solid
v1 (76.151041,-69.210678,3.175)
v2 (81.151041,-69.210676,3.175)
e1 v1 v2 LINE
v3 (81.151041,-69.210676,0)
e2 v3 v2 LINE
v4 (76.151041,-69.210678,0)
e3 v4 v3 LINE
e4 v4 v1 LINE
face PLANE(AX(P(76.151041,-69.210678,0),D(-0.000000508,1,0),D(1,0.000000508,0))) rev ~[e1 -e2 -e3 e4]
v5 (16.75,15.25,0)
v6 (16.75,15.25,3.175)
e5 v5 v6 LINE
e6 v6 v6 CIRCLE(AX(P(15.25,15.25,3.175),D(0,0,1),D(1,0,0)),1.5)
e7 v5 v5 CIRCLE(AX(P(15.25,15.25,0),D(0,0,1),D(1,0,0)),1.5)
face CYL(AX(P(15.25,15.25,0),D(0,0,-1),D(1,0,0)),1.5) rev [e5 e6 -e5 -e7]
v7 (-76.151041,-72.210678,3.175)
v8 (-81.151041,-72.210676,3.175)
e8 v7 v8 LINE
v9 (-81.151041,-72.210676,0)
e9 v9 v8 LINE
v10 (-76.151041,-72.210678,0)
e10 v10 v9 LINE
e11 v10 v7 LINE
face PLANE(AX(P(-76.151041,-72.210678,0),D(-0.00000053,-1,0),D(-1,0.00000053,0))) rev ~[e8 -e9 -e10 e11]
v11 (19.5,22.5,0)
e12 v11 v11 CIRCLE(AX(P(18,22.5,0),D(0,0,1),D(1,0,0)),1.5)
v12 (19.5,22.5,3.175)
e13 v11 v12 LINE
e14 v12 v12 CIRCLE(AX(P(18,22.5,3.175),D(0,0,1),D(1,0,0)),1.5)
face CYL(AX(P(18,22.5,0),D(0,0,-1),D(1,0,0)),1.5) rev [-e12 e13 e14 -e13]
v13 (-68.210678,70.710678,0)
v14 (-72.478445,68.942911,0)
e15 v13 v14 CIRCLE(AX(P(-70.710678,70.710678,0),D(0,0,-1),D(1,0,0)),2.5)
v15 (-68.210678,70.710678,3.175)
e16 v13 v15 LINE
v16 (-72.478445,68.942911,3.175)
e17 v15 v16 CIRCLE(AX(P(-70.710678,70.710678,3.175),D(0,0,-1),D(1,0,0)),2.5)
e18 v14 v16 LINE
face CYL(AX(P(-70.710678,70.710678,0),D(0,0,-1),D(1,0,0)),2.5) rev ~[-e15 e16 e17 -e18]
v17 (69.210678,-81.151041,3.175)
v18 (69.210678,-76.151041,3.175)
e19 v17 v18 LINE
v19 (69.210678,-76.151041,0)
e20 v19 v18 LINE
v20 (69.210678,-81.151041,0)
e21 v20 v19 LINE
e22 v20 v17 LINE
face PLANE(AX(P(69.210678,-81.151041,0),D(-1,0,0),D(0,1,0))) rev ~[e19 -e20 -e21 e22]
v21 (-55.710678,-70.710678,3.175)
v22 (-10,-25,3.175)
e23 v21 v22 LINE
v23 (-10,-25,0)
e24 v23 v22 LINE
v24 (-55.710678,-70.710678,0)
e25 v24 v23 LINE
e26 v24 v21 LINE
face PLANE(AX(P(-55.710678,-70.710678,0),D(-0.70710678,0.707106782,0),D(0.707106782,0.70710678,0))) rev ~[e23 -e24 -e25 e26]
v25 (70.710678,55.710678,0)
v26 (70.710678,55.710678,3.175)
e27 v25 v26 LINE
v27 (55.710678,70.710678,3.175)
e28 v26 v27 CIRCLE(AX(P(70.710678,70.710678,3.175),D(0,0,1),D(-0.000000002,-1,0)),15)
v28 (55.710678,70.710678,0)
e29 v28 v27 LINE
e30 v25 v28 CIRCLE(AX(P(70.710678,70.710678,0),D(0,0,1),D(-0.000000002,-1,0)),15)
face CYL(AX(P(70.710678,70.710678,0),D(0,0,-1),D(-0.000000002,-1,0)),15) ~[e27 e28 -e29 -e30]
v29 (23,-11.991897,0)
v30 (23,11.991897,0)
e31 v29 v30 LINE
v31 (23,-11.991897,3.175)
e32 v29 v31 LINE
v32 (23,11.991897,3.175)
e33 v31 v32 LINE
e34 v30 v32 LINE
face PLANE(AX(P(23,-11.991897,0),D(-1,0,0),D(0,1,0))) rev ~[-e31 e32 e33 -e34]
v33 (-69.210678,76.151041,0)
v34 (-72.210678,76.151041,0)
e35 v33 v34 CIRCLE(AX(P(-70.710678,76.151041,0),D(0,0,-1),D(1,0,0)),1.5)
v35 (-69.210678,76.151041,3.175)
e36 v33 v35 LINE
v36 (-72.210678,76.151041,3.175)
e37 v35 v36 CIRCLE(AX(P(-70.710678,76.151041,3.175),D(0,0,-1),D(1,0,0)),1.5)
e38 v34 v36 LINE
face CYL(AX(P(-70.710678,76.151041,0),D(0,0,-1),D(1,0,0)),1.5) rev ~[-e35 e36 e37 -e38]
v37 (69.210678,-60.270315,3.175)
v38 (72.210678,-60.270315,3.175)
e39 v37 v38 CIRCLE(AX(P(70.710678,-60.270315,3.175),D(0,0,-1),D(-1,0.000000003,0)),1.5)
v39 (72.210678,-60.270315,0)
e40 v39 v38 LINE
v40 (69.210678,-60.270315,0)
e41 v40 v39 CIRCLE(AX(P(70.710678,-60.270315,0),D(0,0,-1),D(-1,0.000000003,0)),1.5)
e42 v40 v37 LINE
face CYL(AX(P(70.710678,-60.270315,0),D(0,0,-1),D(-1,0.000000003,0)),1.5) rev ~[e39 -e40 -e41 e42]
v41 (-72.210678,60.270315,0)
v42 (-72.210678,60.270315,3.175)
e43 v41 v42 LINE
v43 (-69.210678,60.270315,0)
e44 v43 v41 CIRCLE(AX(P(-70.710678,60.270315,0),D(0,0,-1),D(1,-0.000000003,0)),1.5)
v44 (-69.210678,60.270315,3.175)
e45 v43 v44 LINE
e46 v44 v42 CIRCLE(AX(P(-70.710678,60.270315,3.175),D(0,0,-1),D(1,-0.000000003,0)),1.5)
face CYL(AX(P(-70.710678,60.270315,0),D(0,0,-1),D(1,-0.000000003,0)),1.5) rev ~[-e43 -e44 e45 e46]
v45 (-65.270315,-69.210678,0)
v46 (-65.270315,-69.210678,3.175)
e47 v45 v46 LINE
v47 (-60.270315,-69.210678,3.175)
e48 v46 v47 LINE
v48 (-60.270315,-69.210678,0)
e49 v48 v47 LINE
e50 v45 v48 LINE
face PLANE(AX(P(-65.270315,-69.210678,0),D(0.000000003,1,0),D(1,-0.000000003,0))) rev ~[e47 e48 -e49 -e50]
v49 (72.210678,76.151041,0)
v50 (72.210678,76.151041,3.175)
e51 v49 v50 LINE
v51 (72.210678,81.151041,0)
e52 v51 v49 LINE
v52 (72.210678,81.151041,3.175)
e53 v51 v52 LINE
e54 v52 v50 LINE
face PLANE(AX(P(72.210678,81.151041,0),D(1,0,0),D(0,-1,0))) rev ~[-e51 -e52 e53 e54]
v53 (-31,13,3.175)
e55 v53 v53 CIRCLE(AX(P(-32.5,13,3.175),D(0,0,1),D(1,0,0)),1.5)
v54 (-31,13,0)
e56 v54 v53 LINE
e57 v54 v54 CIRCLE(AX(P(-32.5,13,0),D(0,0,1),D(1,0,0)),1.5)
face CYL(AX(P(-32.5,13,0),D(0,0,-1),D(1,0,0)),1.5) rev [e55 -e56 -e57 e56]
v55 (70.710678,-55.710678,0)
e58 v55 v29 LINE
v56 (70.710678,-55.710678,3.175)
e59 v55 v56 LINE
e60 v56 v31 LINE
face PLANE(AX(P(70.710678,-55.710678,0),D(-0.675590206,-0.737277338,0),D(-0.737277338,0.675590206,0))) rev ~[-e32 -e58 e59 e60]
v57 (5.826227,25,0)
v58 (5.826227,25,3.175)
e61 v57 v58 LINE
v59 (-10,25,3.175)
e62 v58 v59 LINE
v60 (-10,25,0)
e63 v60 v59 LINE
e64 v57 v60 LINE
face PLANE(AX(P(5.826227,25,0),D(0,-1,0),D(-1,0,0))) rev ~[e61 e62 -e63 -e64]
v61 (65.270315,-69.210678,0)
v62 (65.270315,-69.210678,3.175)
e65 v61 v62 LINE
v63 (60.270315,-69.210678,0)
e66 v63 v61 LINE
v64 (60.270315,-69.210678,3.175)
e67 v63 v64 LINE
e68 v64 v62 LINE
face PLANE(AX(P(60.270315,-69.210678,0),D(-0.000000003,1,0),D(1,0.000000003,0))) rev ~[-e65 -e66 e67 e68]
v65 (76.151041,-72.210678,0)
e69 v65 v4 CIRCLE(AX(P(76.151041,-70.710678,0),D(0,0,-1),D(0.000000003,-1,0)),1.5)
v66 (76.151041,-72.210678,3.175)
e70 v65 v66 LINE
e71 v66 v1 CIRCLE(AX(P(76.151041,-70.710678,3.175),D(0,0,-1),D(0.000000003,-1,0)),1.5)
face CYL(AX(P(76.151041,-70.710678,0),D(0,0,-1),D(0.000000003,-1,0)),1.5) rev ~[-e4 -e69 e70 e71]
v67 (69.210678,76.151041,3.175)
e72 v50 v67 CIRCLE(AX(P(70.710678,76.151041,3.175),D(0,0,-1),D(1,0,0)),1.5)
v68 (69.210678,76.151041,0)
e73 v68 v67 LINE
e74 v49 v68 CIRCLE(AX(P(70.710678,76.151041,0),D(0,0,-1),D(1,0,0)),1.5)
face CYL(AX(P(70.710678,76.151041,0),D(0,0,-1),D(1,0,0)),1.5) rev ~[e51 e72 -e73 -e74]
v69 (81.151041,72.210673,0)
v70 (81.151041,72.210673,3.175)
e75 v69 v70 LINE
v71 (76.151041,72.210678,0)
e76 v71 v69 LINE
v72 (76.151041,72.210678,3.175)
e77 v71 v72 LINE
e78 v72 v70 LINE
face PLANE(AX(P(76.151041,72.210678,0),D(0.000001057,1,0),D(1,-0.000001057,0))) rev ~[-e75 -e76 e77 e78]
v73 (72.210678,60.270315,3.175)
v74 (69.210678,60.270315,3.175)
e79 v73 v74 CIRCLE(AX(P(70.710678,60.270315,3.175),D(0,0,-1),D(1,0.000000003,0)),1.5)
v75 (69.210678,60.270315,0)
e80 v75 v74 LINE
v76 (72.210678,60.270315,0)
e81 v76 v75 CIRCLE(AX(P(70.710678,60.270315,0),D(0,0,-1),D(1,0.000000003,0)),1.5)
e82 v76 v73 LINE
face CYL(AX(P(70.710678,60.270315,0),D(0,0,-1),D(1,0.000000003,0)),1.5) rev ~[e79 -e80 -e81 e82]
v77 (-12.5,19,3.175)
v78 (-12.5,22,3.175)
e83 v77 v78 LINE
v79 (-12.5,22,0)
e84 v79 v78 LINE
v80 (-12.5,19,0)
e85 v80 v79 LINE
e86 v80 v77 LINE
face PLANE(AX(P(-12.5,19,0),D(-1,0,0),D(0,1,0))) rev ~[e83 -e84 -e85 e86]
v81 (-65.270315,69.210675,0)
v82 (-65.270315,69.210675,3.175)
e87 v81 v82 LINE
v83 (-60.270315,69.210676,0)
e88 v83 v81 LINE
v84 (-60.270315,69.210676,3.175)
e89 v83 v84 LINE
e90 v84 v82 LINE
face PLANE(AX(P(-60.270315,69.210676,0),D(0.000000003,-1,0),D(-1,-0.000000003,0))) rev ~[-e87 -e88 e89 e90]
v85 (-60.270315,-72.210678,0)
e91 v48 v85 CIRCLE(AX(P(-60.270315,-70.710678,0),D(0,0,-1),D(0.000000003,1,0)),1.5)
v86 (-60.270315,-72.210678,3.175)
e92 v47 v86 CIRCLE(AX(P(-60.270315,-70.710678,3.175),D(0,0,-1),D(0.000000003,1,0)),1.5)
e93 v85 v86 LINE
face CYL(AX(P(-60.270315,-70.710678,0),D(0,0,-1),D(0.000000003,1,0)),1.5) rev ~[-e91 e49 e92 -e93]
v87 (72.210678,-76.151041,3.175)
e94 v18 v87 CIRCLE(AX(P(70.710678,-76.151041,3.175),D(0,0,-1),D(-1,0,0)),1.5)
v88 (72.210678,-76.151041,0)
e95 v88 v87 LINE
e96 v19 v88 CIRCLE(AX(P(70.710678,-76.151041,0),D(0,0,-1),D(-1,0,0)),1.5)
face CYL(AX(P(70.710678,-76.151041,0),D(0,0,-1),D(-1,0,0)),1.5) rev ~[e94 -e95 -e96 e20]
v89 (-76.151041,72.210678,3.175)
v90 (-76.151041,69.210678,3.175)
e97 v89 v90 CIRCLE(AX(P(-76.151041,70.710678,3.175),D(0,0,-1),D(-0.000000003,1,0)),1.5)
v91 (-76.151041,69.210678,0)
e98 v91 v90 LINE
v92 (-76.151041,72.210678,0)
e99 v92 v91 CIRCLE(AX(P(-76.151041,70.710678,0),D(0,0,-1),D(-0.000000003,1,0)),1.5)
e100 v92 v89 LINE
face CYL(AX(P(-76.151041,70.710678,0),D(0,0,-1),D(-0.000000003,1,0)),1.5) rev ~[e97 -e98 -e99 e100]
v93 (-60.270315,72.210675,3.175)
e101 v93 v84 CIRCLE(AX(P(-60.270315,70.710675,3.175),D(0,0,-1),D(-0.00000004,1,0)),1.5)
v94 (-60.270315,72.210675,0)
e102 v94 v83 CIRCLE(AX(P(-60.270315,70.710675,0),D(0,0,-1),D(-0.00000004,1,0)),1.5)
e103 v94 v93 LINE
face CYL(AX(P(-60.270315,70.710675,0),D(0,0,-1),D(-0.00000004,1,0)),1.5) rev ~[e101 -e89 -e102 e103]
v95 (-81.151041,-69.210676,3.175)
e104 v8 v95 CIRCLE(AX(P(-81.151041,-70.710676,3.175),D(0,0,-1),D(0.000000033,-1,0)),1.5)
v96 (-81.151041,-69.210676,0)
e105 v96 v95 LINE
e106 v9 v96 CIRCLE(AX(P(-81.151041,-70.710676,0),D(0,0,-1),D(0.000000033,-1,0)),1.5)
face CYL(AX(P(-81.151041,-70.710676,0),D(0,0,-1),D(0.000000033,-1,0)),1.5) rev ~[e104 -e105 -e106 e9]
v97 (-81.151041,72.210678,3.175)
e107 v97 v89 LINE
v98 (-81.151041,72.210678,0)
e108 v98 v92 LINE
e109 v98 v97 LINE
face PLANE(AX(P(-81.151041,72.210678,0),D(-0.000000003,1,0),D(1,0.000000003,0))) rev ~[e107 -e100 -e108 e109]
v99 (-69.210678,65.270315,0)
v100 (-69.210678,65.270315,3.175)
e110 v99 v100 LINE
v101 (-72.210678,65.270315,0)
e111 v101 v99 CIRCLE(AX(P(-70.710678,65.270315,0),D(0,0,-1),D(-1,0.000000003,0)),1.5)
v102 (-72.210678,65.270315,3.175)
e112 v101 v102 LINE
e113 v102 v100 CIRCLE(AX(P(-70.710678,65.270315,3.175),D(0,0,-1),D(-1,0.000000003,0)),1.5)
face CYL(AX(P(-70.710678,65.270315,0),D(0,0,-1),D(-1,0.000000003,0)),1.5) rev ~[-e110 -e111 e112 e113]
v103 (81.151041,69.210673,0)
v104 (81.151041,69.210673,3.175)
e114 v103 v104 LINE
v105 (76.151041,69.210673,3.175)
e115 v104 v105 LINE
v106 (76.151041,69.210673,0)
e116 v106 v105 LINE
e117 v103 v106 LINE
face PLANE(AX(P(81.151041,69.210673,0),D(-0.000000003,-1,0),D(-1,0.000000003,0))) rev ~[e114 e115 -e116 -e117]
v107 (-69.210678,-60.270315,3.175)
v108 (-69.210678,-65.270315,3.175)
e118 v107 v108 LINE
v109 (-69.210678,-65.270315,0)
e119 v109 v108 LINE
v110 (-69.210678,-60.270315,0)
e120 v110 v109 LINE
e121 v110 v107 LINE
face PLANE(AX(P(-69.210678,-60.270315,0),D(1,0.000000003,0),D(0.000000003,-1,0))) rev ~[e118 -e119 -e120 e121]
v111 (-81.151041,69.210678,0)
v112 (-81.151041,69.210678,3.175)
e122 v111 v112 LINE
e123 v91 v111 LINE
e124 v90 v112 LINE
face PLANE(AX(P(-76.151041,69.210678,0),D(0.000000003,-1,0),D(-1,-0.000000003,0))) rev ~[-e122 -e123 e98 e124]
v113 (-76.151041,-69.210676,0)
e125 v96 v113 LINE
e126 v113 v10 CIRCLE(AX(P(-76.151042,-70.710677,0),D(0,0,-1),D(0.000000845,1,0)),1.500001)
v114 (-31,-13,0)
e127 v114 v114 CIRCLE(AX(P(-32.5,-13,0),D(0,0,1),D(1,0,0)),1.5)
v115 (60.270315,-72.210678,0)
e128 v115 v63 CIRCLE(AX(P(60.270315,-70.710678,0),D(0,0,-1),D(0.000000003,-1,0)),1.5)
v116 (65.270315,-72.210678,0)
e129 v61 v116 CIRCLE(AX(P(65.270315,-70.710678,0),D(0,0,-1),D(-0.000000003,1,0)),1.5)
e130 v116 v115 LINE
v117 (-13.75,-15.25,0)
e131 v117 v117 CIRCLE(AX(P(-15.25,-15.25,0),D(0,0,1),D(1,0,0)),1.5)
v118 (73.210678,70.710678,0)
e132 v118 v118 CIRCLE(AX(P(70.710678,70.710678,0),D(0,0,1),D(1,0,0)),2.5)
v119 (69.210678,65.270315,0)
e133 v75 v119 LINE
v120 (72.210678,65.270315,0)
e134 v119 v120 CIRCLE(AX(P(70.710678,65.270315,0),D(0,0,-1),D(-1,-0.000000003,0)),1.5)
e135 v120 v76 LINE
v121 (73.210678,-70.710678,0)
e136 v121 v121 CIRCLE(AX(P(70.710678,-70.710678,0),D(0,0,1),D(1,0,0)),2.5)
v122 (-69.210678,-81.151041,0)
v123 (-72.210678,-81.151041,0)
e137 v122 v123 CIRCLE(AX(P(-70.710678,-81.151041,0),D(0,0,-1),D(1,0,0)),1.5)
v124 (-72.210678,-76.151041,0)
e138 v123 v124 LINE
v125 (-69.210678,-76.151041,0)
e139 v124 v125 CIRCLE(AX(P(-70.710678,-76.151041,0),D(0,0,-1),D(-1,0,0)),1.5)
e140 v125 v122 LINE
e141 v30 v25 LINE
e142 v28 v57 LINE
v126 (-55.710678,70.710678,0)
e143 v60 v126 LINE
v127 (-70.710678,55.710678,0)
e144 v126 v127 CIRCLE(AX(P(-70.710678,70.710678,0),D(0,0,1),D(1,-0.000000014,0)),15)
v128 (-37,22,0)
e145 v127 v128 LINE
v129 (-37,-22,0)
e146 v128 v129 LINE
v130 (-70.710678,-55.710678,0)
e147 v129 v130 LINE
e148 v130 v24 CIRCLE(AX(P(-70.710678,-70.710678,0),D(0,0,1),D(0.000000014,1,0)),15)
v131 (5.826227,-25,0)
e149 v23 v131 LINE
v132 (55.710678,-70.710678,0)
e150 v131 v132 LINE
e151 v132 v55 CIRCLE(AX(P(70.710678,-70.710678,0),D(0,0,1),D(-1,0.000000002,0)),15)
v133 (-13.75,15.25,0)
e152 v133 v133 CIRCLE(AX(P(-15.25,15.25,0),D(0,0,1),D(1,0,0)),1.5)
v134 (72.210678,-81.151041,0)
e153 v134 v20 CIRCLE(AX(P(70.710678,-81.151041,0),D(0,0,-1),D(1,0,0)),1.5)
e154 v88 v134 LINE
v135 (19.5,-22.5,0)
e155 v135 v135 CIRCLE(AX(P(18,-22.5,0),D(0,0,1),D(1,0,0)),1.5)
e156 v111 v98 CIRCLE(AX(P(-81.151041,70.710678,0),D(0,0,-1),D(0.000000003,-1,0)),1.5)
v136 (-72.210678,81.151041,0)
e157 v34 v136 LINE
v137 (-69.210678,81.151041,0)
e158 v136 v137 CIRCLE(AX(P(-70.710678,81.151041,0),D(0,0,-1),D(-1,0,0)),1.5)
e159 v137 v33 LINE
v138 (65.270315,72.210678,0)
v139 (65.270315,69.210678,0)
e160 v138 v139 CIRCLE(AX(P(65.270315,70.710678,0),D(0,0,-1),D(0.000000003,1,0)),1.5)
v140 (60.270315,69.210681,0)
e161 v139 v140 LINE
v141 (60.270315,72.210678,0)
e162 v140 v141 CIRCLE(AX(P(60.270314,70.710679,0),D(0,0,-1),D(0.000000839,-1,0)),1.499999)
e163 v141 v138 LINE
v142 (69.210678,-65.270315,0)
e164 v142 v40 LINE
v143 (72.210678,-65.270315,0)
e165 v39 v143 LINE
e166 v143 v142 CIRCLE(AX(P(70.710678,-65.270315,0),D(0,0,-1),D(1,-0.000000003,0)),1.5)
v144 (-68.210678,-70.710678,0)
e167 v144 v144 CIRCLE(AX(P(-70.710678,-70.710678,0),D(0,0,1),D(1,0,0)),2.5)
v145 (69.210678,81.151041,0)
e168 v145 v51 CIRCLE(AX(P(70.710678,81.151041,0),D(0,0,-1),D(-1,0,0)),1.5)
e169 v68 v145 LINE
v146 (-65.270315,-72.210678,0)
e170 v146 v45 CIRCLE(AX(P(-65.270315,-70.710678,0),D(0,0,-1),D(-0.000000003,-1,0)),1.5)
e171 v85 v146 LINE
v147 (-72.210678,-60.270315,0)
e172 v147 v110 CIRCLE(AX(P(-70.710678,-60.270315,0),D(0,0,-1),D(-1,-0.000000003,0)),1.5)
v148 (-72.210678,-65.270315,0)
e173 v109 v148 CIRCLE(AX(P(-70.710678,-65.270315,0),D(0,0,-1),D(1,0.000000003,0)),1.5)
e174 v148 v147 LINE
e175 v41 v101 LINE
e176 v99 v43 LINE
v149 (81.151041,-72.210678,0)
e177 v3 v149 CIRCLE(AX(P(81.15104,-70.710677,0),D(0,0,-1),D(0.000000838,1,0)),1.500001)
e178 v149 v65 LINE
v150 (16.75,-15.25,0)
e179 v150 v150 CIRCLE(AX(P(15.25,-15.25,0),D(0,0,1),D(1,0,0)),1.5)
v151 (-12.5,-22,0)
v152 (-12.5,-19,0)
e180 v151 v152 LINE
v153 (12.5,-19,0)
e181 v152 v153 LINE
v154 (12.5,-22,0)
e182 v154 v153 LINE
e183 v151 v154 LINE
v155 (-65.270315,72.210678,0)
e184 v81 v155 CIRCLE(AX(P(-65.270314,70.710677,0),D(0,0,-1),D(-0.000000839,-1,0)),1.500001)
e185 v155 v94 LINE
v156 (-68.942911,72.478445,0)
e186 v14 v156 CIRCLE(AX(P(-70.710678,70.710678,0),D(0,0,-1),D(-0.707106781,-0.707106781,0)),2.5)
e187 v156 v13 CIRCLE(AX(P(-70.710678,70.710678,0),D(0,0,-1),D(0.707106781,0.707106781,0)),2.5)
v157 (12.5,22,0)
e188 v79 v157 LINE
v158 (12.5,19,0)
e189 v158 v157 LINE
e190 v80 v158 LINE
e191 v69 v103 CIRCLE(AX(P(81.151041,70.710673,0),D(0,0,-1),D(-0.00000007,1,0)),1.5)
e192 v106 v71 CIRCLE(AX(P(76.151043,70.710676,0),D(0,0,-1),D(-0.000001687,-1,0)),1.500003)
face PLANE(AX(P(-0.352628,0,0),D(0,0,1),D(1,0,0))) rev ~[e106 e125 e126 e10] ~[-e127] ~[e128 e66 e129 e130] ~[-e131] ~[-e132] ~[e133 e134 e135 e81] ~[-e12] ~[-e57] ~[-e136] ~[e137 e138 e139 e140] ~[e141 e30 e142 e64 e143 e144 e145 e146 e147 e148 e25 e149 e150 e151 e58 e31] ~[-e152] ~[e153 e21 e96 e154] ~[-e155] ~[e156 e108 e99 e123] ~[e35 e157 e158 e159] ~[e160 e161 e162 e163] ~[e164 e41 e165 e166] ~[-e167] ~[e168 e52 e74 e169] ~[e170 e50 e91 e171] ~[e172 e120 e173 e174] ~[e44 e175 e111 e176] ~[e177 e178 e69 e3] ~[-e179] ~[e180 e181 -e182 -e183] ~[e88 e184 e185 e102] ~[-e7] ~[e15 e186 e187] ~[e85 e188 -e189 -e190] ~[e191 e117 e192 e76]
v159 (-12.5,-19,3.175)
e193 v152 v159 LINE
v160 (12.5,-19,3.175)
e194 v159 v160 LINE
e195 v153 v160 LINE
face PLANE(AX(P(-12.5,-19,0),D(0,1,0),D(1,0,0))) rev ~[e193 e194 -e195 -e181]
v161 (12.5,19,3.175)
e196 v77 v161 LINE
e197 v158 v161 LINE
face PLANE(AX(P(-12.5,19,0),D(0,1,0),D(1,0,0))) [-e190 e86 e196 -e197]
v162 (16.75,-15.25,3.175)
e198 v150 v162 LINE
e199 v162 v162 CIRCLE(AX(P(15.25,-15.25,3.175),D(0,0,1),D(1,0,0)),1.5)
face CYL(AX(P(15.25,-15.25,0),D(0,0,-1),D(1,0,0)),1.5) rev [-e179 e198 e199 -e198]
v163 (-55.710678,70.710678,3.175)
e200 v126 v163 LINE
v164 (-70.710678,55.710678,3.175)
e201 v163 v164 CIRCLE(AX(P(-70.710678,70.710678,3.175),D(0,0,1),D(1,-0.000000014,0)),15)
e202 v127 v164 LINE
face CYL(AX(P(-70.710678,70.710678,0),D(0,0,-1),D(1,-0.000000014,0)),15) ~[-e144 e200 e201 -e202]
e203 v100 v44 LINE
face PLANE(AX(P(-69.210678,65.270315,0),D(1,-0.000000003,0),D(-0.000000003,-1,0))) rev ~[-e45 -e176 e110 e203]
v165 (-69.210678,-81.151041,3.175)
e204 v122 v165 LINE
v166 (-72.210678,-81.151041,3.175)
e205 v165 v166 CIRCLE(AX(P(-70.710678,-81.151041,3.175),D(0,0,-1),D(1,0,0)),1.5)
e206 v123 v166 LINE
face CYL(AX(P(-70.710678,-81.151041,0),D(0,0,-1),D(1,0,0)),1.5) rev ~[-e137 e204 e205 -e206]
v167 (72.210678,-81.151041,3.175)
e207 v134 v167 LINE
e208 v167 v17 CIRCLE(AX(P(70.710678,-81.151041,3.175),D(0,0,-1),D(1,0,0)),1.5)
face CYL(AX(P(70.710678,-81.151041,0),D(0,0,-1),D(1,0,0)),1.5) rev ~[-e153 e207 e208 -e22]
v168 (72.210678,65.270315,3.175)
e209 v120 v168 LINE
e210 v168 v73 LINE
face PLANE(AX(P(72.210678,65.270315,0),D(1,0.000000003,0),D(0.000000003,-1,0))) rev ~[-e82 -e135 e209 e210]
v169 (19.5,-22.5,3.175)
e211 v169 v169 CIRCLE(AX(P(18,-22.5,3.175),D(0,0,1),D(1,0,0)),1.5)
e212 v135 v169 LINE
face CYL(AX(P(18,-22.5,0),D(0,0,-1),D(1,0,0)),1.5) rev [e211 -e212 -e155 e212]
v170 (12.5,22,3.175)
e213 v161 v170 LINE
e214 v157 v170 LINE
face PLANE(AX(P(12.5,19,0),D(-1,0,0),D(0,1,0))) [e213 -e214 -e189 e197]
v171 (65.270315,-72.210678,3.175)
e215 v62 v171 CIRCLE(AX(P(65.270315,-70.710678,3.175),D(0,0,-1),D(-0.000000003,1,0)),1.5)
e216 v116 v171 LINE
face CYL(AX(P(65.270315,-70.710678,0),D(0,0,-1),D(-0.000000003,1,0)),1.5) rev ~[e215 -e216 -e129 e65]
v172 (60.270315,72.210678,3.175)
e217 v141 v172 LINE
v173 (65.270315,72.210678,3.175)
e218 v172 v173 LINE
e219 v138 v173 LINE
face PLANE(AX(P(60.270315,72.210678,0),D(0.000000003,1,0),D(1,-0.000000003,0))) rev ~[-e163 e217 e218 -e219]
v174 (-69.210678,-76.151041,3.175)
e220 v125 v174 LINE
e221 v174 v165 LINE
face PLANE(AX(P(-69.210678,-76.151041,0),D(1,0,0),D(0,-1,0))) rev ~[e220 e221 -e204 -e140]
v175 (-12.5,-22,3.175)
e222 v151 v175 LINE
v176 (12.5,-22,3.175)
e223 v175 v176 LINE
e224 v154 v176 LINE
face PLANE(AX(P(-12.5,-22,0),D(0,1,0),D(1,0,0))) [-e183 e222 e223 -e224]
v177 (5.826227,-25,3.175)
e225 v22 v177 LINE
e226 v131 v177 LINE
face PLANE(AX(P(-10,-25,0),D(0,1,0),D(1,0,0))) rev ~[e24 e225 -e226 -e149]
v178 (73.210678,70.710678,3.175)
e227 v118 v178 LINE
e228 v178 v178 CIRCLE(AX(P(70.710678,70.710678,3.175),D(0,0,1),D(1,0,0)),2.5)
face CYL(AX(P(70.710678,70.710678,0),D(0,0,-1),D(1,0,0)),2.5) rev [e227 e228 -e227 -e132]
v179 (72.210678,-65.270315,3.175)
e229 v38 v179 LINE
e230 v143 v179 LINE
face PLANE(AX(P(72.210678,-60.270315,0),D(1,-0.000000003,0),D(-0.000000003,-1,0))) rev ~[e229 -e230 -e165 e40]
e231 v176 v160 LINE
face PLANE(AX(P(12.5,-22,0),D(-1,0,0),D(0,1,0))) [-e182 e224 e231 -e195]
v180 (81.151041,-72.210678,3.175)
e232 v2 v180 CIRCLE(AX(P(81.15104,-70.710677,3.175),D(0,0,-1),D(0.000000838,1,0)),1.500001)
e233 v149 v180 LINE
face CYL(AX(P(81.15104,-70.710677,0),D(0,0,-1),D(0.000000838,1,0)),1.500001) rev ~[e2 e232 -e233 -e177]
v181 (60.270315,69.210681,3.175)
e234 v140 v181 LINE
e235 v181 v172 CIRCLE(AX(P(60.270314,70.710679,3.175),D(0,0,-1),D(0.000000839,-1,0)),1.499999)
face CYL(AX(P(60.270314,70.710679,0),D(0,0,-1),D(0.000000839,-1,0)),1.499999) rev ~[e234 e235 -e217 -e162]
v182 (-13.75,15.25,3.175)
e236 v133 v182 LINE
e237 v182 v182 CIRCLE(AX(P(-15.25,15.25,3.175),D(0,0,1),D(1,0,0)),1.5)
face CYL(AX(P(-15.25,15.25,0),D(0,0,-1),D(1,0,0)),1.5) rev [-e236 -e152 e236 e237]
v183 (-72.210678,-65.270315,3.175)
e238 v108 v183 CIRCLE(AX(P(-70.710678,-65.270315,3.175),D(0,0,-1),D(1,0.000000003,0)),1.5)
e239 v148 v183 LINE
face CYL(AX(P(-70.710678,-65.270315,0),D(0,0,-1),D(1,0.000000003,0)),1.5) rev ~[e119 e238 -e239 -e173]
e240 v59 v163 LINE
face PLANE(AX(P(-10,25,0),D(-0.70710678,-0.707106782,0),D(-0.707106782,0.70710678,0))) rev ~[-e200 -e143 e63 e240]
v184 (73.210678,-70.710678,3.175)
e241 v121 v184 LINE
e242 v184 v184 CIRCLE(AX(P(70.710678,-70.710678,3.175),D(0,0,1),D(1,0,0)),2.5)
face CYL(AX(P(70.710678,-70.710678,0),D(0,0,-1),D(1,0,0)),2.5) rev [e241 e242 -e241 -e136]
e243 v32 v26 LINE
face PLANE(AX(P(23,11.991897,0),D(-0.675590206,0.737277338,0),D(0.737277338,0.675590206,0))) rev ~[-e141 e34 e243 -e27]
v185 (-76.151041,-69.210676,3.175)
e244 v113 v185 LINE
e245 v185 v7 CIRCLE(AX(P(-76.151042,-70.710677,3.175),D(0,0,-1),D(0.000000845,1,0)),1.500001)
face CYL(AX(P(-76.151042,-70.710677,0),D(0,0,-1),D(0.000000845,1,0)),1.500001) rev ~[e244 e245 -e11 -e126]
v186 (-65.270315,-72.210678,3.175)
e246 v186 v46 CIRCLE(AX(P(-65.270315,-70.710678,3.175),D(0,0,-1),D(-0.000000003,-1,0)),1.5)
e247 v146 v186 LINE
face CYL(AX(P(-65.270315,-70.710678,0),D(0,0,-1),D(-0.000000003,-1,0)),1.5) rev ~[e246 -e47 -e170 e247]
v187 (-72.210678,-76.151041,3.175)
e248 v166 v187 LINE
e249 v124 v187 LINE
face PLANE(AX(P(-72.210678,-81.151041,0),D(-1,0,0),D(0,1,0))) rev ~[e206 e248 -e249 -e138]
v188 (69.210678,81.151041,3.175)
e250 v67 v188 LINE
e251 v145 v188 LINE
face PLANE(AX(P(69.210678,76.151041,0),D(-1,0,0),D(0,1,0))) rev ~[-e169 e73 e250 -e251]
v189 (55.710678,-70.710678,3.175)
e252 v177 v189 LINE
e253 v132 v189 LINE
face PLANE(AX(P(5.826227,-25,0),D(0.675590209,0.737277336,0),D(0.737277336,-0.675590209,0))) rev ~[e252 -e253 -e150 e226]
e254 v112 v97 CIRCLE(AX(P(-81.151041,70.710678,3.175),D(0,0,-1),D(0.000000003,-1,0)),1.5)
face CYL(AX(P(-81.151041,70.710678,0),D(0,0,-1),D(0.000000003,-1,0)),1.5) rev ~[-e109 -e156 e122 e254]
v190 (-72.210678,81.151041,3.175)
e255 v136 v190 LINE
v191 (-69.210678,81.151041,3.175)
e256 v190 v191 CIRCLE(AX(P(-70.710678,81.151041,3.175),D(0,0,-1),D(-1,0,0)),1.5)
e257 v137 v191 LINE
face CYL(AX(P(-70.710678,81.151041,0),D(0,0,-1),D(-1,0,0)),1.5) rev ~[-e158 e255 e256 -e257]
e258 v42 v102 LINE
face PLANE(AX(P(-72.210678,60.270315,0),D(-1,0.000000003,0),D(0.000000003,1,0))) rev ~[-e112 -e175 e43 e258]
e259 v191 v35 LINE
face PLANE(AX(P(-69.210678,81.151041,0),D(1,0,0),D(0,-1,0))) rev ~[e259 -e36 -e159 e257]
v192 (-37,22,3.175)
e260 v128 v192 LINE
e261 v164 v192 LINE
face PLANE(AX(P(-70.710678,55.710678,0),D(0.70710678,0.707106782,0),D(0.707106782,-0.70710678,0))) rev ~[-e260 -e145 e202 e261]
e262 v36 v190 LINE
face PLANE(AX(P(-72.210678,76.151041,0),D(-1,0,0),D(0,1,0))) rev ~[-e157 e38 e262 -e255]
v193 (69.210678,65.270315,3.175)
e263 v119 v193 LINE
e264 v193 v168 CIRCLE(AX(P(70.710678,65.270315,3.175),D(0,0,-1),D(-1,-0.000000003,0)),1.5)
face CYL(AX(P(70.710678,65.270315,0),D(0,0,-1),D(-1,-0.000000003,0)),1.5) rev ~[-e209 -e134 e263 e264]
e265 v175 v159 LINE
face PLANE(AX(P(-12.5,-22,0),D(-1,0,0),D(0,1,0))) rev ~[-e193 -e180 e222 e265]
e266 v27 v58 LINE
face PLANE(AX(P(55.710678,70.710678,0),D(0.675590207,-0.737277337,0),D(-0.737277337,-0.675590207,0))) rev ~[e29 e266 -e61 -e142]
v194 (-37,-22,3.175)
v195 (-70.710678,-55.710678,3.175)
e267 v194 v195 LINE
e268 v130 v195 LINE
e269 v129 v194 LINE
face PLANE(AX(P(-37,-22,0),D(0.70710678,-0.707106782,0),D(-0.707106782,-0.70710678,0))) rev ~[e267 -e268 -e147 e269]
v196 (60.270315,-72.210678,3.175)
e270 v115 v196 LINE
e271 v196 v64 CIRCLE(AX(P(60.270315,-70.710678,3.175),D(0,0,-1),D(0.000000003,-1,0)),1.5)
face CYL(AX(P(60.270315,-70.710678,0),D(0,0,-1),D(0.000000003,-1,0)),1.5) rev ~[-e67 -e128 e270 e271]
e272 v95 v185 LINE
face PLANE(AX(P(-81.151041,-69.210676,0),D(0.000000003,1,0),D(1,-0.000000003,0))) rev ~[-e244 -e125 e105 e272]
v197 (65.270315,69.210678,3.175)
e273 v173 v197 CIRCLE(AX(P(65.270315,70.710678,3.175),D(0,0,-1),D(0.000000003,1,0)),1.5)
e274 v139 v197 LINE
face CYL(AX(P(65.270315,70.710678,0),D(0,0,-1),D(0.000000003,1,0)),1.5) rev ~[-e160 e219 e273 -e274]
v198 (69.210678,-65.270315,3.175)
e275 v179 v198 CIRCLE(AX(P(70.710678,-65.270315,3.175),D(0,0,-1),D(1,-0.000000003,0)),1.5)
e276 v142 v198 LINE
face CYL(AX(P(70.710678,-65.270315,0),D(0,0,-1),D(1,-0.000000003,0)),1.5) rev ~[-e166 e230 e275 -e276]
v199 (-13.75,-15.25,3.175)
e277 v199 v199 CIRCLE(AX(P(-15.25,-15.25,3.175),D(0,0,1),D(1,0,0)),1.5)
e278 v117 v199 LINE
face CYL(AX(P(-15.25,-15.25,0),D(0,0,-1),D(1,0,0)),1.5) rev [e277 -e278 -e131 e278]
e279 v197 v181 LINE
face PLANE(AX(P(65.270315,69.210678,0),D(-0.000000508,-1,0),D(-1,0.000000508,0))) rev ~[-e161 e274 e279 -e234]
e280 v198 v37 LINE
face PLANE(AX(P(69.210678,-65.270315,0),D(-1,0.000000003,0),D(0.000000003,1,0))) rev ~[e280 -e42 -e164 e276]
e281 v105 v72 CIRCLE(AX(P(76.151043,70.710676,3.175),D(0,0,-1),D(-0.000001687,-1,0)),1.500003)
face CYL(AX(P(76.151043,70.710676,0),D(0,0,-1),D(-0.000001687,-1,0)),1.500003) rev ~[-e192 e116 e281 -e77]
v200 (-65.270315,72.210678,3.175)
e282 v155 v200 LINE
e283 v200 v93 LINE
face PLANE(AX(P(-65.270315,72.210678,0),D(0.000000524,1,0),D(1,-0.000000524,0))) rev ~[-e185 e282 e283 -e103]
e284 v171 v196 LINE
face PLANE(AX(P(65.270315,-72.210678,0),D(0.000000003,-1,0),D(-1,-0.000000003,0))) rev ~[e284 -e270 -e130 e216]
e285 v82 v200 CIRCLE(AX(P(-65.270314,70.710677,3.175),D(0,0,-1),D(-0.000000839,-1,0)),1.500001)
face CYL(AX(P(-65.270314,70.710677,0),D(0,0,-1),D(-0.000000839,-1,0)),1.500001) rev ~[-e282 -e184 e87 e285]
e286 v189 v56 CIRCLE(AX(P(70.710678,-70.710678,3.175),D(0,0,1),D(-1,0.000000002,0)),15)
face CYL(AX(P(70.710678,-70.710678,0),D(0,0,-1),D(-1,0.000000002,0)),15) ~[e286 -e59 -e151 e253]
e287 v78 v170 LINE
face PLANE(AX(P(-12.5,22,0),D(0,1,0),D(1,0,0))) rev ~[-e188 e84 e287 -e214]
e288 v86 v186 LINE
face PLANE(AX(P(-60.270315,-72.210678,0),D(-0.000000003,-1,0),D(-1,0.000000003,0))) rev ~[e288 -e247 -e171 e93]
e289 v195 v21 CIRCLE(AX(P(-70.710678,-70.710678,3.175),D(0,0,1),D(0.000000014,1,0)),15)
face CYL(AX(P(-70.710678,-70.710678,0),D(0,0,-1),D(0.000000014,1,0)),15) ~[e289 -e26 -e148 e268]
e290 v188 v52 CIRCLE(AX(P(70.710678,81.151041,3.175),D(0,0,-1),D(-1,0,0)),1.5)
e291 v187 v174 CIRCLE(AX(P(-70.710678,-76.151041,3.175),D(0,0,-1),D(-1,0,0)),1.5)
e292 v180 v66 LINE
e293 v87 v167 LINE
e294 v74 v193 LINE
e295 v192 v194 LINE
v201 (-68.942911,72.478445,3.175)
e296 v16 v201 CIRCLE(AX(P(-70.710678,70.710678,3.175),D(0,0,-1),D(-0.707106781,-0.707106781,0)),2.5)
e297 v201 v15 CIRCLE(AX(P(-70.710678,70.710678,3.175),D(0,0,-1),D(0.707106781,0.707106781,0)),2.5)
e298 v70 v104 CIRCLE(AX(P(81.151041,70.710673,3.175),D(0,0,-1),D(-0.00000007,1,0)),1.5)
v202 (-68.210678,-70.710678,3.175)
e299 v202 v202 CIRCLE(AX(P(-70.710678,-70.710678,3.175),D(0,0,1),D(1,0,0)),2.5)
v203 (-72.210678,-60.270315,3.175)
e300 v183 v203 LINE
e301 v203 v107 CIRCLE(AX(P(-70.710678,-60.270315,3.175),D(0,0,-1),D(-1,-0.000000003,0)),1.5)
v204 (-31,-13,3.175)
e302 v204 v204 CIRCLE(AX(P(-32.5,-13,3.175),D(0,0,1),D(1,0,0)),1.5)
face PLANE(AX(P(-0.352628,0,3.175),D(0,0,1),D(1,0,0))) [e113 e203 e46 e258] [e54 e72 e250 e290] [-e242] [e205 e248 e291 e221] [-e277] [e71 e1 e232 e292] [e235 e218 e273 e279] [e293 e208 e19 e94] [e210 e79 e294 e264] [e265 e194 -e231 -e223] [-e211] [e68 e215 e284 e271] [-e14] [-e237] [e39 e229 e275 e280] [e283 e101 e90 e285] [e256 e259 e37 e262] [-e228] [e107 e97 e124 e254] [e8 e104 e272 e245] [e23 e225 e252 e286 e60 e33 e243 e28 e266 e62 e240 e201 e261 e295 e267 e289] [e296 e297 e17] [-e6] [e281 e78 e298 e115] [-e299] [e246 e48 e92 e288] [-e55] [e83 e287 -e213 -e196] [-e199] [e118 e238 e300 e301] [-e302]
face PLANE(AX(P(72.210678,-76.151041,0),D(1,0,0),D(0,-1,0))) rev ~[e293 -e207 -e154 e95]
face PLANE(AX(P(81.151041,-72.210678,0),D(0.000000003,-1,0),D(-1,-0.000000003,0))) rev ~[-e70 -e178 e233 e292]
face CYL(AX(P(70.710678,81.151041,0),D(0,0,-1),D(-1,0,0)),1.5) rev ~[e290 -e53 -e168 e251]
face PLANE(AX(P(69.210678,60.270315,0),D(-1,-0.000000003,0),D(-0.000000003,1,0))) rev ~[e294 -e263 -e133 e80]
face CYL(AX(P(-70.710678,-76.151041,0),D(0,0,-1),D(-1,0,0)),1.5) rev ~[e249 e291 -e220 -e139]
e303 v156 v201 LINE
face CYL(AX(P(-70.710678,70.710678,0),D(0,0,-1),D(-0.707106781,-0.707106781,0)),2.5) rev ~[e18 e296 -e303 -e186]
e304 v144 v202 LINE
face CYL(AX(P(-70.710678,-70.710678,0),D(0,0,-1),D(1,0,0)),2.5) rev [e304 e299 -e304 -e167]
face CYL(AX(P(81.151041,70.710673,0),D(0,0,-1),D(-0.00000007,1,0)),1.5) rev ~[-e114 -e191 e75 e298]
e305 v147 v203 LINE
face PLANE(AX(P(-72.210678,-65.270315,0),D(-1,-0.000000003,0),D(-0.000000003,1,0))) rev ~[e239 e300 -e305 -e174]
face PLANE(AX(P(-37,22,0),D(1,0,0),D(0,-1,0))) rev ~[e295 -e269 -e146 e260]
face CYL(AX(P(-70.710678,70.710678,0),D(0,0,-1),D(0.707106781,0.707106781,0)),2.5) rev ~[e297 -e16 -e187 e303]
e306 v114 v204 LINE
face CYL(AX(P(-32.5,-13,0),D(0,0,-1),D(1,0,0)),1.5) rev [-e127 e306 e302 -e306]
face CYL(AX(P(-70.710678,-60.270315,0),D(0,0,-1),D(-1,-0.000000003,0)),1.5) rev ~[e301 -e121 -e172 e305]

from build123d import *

# Parameters (mm, degrees)
F0_R     = 2.5
F0_R_2   = 1.5
F0_W     = 25
F0_H     = 3
F1_DEPTH = 3.175


# Not quite as in the source:
# - ends of sketch curves that miss each other by under 0.0002 mm in the source are joined


with BuildPart() as f1:
    # F0 (on Top) → F1 (new body)
    with BuildSketch(Plane.XY):
        with BuildLine():
            Line((-10.0000000587, 25), (-55.7106781187, 70.7106779065))
            ThreePointArc((-55.7106781187, 70.7106779065), (-81.3172799026, 81.3172797703), (-70.7106779065, 55.7106781187))
            Line((-70.7106779065, 55.7106781187), (-37, 22.0000003253))
            Line((-37, 22.0000003253), (-37, -22.0000003253))
            Line((-37, -22.0000003253), (-70.7106779065, -55.7106781187))
            ThreePointArc((-70.7106779065, -55.7106781187), (-81.3172798365, -81.3172798365), (-55.7106781187, -70.7106779065))
            Line((-55.7106781187, -70.7106779065), (-10.0000000587, -25))
            Line((-10.0000000587, -25), (5.8262266936, -25))
            Line((5.8262266936, -25), (55.7106781187, -70.7106780935))
            ThreePointArc((55.7106781187, -70.7106780935), (81.3172798365, -81.3172798365), (70.7106780935, -55.7106781187))
            Line((70.7106780935, -55.7106781187), (23, -11.9918965954))
            Line((23, -11.9918965954), (23, 11.9918965954))
            Line((23, 11.9918965954), (70.7106780935, 55.7106781187))
            ThreePointArc((70.7106780935, 55.7106781187), (81.3172798365, 81.3172798365), (55.7106781187, 70.7106779065))
            Line((55.7106781187, 70.7106779065), (5.8262266936, 25))
            Line((5.8262266936, 25), (-10.0000000587, 25))
        make_face()
        with BuildLine():
            Line((-72.210678, -81.1510407925), (-72.210678, -76.1510407925))
            ThreePointArc((-72.210678, -76.1510407925), (-70.710678, -74.6510407925), (-69.210678, -76.1510407925))
            Line((-69.210678, -76.1510407925), (-69.210678, -81.1510407925))
            ThreePointArc((-69.210678, -81.1510407925), (-70.710678, -82.6510407925), (-72.210678, -81.1510407925))
        make_face(mode=Mode.SUBTRACT)
        with BuildLine():
            Line((-81.1510407874, -69.2106756767), (-76.1510407874, -69.2106756935))
            ThreePointArc((-76.1510407874, -69.2106756935), (-74.6510407925, -70.7106782241), (-76.1510407975, -72.2106782191))
            Line((-76.1510407975, -72.2106782191), (-81.1510407975, -72.2106755673))
            ThreePointArc((-81.1510407975, -72.2106755673), (-82.6510407925, -70.7106781972), (-81.1510407874, -69.2106756767))
        make_face(mode=Mode.SUBTRACT)
        with Locations((-70.7106781187, -70.7106781187)):
            Circle(F0_R, mode=Mode.SUBTRACT)
        with BuildLine():
            Line((-60.2703154499, -72.210678035), (-65.2703154499, -72.2106780183))
            ThreePointArc((-65.2703154499, -72.2106780183), (-66.7703154448, -70.7106780132), (-65.2703154398, -69.2106780183))
            Line((-65.2703154398, -69.2106780183), (-60.2703154398, -69.210678035))
            ThreePointArc((-60.2703154398, -69.210678035), (-58.7703154448, -70.7106780401), (-60.2703154499, -72.210678035))
        make_face(mode=Mode.SUBTRACT)
        with BuildLine():
            Line((-69.210678035, -60.2703154398), (-69.2106780183, -65.2703154398))
            ThreePointArc((-69.2106780183, -65.2703154398), (-70.7106780132, -66.7703154448), (-72.2106780183, -65.2703154499))
            Line((-72.2106780183, -65.2703154499), (-72.210678035, -60.2703154499))
            ThreePointArc((-72.210678035, -60.2703154499), (-70.7106780401, -58.7703154448), (-69.210678035, -60.2703154398))
        make_face(mode=Mode.SUBTRACT)
        with Locations((-32.5, -13)):
            Circle(F0_R_2, mode=Mode.SUBTRACT)
        with Locations((-15.25, -15.25)):
            Circle(F0_R_2, mode=Mode.SUBTRACT)
        with BuildLine():
            Line((60.2703154398, -69.210678035), (65.2703154398, -69.2106780183))
            ThreePointArc((65.2703154398, -69.2106780183), (66.7703154448, -70.7106780132), (65.2703154499, -72.2106780183))
            Line((65.2703154499, -72.2106780183), (60.2703154499, -72.210678035))
            ThreePointArc((60.2703154499, -72.210678035), (58.7703154448, -70.7106780401), (60.2703154398, -69.210678035))
        make_face(mode=Mode.SUBTRACT)
        with BuildLine():
            ThreePointArc((69.210678, -76.1510407925), (70.710678, -74.6510407925), (72.210678, -76.1510407925))
            Line((72.210678, -76.1510407925), (72.210678, -81.1510407925))
            ThreePointArc((72.210678, -81.1510407925), (70.710678, -82.6510407925), (69.210678, -81.1510407925))
            Line((69.210678, -81.1510407925), (69.210678, -76.1510407925))
        make_face(mode=Mode.SUBTRACT)
        with Locations((70.7106781187, -70.7106781187)):
            Circle(F0_R, mode=Mode.SUBTRACT)
        with BuildLine():
            ThreePointArc((76.1510407975, -72.2106782191), (74.6510407925, -70.7106782241), (76.1510407874, -69.2106782191))
            Line((76.1510407874, -69.2106782191), (81.1510407874, -69.2106756767))
            ThreePointArc((81.1510407874, -69.2106756767), (82.6510407925, -70.7106781972), (81.1510407975, -72.2106782023))
            Line((81.1510407975, -72.2106782023), (76.1510407975, -72.2106782191))
        make_face(mode=Mode.SUBTRACT)
        with BuildLine():
            ThreePointArc((72.2106780183, -65.2703154499), (70.7106780132, -66.7703154448), (69.2106780183, -65.2703154398))
            Line((69.2106780183, -65.2703154398), (69.210678035, -60.2703154398))
            ThreePointArc((69.210678035, -60.2703154398), (70.7106780401, -58.7703154448), (72.210678035, -60.2703154499))
            Line((72.210678035, -60.2703154499), (72.2106780183, -65.2703154499))
        make_face(mode=Mode.SUBTRACT)
        with Locations((18, -22.5)):
            Circle(F0_R_2, mode=Mode.SUBTRACT)
        with Locations((0, -20.5)):
            Rectangle(F0_W, F0_H, mode=Mode.SUBTRACT)
        with Locations((15.25, -15.25)):
            Circle(F0_R_2, mode=Mode.SUBTRACT)
        with Locations((-32.5, 13)):
            Circle(F0_R_2, mode=Mode.SUBTRACT)
        with Locations((-15.25, 15.25)):
            Circle(F0_R_2, mode=Mode.SUBTRACT)
        with BuildLine():
            ThreePointArc((-72.2106780183, 65.2703154499), (-70.7106780132, 66.7703154448), (-69.2106780183, 65.2703154398))
            Line((-69.2106780183, 65.2703154398), (-69.210678035, 60.2703154398))
            ThreePointArc((-69.210678035, 60.2703154398), (-70.7106780401, 58.7703154448), (-72.210678035, 60.2703154499))
            Line((-72.210678035, 60.2703154499), (-72.2106780183, 65.2703154499))
        make_face(mode=Mode.SUBTRACT)
        with BuildLine():
            ThreePointArc((-76.1510407975, 72.2106782191), (-74.6510407925, 70.7106782241), (-76.1510407874, 69.2106782191))
            Line((-76.1510407874, 69.2106782191), (-81.1510407874, 69.2106782023))
            ThreePointArc((-81.1510407874, 69.2106782023), (-82.6510407925, 70.7106781972), (-81.1510407975, 72.2106782023))
            Line((-81.1510407975, 72.2106782023), (-76.1510407975, 72.2106782191))
        make_face(mode=Mode.SUBTRACT)
        with BuildLine():
            ThreePointArc((-68.9429111657, 72.4784450716), (-68.4009792874, 71.6673866996), (-68.2106781187, 70.7106781187))
            ThreePointArc((-68.2106781187, 70.7106781187), (-69.7539695377, 68.4009792874), (-72.4784450716, 68.9429111657))
            ThreePointArc((-72.4784450716, 68.9429111657), (-72.4784450716, 72.4784450716), (-68.9429111657, 72.4784450716))
        make_face(mode=Mode.SUBTRACT)
        with BuildLine():
            Line((-69.210678, 81.1510407925), (-69.210678, 76.1510407925))
            ThreePointArc((-69.210678, 76.1510407925), (-70.710678, 74.6510407925), (-72.210678, 76.1510407925))
            Line((-72.210678, 76.1510407925), (-72.210678, 81.1510407925))
            ThreePointArc((-72.210678, 81.1510407925), (-70.710678, 82.6510407925), (-69.210678, 81.1510407925))
        make_face(mode=Mode.SUBTRACT)
        with BuildLine():
            Line((-60.2703154398, 69.2106755095), (-65.2703154398, 69.2106754927))
            ThreePointArc((-65.2703154398, 69.2106754927), (-66.7703154448, 70.7106780132), (-65.2703154499, 72.2106780183))
            Line((-65.2703154499, 72.2106780183), (-60.2703154499, 72.2106754))
            ThreePointArc((-60.2703154499, 72.2106754), (-58.7703154448, 70.7106780401), (-60.2703154398, 69.2106755095))
        make_face(mode=Mode.SUBTRACT)
        with Locations((0, 20.5)):
            Rectangle(F0_W, F0_H, mode=Mode.SUBTRACT)
        with Locations((15.25, 15.25)):
            Circle(F0_R_2, mode=Mode.SUBTRACT)
        with Locations((18, 22.5)):
            Circle(F0_R_2, mode=Mode.SUBTRACT)
        with BuildLine():
            Line((69.210678035, 60.2703154398), (69.2106780183, 65.2703154398))
            ThreePointArc((69.2106780183, 65.2703154398), (70.7106780132, 66.7703154448), (72.2106780183, 65.2703154499))
            Line((72.2106780183, 65.2703154499), (72.210678035, 60.2703154499))
            ThreePointArc((72.210678035, 60.2703154499), (70.7106780401, 58.7703154448), (69.210678035, 60.2703154398))
        make_face(mode=Mode.SUBTRACT)
        with BuildLine():
            ThreePointArc((65.2703154499, 72.2106780183), (66.7703154448, 70.7106780132), (65.2703154398, 69.2106780183))
            Line((65.2703154398, 69.2106780183), (60.2703154398, 69.2106805606))
            ThreePointArc((60.2703154398, 69.2106805606), (58.7703154448, 70.7106780401), (60.2703154499, 72.210678035))
            Line((60.2703154499, 72.210678035), (65.2703154499, 72.2106780183))
        make_face(mode=Mode.SUBTRACT)
        with Locations((70.7106781187, 70.7106781187)):
            Circle(F0_R, mode=Mode.SUBTRACT)
        with BuildLine():
            Line((81.1510407874, 69.2106731512), (76.1510407874, 69.210673168))
            ThreePointArc((76.1510407874, 69.210673168), (74.6510407925, 70.7106782241), (76.1510407975, 72.2106782191))
            Line((76.1510407975, 72.2106782191), (81.1510407975, 72.2106729322))
            ThreePointArc((81.1510407975, 72.2106729322), (82.6510407925, 70.7106781972), (81.1510407874, 69.2106731512))
        make_face(mode=Mode.SUBTRACT)
        with BuildLine():
            Line((72.210678, 81.1510407925), (72.210678, 76.1510407925))
            ThreePointArc((72.210678, 76.1510407925), (70.710678, 74.6510407925), (69.210678, 76.1510407925))
            Line((69.210678, 76.1510407925), (69.210678, 81.1510407925))
            ThreePointArc((69.210678, 81.1510407925), (70.710678, 82.6510407925), (72.210678, 81.1510407925))
        make_face(mode=Mode.SUBTRACT)
    extrude(amount=F1_DEPTH)


solid = f1.part
